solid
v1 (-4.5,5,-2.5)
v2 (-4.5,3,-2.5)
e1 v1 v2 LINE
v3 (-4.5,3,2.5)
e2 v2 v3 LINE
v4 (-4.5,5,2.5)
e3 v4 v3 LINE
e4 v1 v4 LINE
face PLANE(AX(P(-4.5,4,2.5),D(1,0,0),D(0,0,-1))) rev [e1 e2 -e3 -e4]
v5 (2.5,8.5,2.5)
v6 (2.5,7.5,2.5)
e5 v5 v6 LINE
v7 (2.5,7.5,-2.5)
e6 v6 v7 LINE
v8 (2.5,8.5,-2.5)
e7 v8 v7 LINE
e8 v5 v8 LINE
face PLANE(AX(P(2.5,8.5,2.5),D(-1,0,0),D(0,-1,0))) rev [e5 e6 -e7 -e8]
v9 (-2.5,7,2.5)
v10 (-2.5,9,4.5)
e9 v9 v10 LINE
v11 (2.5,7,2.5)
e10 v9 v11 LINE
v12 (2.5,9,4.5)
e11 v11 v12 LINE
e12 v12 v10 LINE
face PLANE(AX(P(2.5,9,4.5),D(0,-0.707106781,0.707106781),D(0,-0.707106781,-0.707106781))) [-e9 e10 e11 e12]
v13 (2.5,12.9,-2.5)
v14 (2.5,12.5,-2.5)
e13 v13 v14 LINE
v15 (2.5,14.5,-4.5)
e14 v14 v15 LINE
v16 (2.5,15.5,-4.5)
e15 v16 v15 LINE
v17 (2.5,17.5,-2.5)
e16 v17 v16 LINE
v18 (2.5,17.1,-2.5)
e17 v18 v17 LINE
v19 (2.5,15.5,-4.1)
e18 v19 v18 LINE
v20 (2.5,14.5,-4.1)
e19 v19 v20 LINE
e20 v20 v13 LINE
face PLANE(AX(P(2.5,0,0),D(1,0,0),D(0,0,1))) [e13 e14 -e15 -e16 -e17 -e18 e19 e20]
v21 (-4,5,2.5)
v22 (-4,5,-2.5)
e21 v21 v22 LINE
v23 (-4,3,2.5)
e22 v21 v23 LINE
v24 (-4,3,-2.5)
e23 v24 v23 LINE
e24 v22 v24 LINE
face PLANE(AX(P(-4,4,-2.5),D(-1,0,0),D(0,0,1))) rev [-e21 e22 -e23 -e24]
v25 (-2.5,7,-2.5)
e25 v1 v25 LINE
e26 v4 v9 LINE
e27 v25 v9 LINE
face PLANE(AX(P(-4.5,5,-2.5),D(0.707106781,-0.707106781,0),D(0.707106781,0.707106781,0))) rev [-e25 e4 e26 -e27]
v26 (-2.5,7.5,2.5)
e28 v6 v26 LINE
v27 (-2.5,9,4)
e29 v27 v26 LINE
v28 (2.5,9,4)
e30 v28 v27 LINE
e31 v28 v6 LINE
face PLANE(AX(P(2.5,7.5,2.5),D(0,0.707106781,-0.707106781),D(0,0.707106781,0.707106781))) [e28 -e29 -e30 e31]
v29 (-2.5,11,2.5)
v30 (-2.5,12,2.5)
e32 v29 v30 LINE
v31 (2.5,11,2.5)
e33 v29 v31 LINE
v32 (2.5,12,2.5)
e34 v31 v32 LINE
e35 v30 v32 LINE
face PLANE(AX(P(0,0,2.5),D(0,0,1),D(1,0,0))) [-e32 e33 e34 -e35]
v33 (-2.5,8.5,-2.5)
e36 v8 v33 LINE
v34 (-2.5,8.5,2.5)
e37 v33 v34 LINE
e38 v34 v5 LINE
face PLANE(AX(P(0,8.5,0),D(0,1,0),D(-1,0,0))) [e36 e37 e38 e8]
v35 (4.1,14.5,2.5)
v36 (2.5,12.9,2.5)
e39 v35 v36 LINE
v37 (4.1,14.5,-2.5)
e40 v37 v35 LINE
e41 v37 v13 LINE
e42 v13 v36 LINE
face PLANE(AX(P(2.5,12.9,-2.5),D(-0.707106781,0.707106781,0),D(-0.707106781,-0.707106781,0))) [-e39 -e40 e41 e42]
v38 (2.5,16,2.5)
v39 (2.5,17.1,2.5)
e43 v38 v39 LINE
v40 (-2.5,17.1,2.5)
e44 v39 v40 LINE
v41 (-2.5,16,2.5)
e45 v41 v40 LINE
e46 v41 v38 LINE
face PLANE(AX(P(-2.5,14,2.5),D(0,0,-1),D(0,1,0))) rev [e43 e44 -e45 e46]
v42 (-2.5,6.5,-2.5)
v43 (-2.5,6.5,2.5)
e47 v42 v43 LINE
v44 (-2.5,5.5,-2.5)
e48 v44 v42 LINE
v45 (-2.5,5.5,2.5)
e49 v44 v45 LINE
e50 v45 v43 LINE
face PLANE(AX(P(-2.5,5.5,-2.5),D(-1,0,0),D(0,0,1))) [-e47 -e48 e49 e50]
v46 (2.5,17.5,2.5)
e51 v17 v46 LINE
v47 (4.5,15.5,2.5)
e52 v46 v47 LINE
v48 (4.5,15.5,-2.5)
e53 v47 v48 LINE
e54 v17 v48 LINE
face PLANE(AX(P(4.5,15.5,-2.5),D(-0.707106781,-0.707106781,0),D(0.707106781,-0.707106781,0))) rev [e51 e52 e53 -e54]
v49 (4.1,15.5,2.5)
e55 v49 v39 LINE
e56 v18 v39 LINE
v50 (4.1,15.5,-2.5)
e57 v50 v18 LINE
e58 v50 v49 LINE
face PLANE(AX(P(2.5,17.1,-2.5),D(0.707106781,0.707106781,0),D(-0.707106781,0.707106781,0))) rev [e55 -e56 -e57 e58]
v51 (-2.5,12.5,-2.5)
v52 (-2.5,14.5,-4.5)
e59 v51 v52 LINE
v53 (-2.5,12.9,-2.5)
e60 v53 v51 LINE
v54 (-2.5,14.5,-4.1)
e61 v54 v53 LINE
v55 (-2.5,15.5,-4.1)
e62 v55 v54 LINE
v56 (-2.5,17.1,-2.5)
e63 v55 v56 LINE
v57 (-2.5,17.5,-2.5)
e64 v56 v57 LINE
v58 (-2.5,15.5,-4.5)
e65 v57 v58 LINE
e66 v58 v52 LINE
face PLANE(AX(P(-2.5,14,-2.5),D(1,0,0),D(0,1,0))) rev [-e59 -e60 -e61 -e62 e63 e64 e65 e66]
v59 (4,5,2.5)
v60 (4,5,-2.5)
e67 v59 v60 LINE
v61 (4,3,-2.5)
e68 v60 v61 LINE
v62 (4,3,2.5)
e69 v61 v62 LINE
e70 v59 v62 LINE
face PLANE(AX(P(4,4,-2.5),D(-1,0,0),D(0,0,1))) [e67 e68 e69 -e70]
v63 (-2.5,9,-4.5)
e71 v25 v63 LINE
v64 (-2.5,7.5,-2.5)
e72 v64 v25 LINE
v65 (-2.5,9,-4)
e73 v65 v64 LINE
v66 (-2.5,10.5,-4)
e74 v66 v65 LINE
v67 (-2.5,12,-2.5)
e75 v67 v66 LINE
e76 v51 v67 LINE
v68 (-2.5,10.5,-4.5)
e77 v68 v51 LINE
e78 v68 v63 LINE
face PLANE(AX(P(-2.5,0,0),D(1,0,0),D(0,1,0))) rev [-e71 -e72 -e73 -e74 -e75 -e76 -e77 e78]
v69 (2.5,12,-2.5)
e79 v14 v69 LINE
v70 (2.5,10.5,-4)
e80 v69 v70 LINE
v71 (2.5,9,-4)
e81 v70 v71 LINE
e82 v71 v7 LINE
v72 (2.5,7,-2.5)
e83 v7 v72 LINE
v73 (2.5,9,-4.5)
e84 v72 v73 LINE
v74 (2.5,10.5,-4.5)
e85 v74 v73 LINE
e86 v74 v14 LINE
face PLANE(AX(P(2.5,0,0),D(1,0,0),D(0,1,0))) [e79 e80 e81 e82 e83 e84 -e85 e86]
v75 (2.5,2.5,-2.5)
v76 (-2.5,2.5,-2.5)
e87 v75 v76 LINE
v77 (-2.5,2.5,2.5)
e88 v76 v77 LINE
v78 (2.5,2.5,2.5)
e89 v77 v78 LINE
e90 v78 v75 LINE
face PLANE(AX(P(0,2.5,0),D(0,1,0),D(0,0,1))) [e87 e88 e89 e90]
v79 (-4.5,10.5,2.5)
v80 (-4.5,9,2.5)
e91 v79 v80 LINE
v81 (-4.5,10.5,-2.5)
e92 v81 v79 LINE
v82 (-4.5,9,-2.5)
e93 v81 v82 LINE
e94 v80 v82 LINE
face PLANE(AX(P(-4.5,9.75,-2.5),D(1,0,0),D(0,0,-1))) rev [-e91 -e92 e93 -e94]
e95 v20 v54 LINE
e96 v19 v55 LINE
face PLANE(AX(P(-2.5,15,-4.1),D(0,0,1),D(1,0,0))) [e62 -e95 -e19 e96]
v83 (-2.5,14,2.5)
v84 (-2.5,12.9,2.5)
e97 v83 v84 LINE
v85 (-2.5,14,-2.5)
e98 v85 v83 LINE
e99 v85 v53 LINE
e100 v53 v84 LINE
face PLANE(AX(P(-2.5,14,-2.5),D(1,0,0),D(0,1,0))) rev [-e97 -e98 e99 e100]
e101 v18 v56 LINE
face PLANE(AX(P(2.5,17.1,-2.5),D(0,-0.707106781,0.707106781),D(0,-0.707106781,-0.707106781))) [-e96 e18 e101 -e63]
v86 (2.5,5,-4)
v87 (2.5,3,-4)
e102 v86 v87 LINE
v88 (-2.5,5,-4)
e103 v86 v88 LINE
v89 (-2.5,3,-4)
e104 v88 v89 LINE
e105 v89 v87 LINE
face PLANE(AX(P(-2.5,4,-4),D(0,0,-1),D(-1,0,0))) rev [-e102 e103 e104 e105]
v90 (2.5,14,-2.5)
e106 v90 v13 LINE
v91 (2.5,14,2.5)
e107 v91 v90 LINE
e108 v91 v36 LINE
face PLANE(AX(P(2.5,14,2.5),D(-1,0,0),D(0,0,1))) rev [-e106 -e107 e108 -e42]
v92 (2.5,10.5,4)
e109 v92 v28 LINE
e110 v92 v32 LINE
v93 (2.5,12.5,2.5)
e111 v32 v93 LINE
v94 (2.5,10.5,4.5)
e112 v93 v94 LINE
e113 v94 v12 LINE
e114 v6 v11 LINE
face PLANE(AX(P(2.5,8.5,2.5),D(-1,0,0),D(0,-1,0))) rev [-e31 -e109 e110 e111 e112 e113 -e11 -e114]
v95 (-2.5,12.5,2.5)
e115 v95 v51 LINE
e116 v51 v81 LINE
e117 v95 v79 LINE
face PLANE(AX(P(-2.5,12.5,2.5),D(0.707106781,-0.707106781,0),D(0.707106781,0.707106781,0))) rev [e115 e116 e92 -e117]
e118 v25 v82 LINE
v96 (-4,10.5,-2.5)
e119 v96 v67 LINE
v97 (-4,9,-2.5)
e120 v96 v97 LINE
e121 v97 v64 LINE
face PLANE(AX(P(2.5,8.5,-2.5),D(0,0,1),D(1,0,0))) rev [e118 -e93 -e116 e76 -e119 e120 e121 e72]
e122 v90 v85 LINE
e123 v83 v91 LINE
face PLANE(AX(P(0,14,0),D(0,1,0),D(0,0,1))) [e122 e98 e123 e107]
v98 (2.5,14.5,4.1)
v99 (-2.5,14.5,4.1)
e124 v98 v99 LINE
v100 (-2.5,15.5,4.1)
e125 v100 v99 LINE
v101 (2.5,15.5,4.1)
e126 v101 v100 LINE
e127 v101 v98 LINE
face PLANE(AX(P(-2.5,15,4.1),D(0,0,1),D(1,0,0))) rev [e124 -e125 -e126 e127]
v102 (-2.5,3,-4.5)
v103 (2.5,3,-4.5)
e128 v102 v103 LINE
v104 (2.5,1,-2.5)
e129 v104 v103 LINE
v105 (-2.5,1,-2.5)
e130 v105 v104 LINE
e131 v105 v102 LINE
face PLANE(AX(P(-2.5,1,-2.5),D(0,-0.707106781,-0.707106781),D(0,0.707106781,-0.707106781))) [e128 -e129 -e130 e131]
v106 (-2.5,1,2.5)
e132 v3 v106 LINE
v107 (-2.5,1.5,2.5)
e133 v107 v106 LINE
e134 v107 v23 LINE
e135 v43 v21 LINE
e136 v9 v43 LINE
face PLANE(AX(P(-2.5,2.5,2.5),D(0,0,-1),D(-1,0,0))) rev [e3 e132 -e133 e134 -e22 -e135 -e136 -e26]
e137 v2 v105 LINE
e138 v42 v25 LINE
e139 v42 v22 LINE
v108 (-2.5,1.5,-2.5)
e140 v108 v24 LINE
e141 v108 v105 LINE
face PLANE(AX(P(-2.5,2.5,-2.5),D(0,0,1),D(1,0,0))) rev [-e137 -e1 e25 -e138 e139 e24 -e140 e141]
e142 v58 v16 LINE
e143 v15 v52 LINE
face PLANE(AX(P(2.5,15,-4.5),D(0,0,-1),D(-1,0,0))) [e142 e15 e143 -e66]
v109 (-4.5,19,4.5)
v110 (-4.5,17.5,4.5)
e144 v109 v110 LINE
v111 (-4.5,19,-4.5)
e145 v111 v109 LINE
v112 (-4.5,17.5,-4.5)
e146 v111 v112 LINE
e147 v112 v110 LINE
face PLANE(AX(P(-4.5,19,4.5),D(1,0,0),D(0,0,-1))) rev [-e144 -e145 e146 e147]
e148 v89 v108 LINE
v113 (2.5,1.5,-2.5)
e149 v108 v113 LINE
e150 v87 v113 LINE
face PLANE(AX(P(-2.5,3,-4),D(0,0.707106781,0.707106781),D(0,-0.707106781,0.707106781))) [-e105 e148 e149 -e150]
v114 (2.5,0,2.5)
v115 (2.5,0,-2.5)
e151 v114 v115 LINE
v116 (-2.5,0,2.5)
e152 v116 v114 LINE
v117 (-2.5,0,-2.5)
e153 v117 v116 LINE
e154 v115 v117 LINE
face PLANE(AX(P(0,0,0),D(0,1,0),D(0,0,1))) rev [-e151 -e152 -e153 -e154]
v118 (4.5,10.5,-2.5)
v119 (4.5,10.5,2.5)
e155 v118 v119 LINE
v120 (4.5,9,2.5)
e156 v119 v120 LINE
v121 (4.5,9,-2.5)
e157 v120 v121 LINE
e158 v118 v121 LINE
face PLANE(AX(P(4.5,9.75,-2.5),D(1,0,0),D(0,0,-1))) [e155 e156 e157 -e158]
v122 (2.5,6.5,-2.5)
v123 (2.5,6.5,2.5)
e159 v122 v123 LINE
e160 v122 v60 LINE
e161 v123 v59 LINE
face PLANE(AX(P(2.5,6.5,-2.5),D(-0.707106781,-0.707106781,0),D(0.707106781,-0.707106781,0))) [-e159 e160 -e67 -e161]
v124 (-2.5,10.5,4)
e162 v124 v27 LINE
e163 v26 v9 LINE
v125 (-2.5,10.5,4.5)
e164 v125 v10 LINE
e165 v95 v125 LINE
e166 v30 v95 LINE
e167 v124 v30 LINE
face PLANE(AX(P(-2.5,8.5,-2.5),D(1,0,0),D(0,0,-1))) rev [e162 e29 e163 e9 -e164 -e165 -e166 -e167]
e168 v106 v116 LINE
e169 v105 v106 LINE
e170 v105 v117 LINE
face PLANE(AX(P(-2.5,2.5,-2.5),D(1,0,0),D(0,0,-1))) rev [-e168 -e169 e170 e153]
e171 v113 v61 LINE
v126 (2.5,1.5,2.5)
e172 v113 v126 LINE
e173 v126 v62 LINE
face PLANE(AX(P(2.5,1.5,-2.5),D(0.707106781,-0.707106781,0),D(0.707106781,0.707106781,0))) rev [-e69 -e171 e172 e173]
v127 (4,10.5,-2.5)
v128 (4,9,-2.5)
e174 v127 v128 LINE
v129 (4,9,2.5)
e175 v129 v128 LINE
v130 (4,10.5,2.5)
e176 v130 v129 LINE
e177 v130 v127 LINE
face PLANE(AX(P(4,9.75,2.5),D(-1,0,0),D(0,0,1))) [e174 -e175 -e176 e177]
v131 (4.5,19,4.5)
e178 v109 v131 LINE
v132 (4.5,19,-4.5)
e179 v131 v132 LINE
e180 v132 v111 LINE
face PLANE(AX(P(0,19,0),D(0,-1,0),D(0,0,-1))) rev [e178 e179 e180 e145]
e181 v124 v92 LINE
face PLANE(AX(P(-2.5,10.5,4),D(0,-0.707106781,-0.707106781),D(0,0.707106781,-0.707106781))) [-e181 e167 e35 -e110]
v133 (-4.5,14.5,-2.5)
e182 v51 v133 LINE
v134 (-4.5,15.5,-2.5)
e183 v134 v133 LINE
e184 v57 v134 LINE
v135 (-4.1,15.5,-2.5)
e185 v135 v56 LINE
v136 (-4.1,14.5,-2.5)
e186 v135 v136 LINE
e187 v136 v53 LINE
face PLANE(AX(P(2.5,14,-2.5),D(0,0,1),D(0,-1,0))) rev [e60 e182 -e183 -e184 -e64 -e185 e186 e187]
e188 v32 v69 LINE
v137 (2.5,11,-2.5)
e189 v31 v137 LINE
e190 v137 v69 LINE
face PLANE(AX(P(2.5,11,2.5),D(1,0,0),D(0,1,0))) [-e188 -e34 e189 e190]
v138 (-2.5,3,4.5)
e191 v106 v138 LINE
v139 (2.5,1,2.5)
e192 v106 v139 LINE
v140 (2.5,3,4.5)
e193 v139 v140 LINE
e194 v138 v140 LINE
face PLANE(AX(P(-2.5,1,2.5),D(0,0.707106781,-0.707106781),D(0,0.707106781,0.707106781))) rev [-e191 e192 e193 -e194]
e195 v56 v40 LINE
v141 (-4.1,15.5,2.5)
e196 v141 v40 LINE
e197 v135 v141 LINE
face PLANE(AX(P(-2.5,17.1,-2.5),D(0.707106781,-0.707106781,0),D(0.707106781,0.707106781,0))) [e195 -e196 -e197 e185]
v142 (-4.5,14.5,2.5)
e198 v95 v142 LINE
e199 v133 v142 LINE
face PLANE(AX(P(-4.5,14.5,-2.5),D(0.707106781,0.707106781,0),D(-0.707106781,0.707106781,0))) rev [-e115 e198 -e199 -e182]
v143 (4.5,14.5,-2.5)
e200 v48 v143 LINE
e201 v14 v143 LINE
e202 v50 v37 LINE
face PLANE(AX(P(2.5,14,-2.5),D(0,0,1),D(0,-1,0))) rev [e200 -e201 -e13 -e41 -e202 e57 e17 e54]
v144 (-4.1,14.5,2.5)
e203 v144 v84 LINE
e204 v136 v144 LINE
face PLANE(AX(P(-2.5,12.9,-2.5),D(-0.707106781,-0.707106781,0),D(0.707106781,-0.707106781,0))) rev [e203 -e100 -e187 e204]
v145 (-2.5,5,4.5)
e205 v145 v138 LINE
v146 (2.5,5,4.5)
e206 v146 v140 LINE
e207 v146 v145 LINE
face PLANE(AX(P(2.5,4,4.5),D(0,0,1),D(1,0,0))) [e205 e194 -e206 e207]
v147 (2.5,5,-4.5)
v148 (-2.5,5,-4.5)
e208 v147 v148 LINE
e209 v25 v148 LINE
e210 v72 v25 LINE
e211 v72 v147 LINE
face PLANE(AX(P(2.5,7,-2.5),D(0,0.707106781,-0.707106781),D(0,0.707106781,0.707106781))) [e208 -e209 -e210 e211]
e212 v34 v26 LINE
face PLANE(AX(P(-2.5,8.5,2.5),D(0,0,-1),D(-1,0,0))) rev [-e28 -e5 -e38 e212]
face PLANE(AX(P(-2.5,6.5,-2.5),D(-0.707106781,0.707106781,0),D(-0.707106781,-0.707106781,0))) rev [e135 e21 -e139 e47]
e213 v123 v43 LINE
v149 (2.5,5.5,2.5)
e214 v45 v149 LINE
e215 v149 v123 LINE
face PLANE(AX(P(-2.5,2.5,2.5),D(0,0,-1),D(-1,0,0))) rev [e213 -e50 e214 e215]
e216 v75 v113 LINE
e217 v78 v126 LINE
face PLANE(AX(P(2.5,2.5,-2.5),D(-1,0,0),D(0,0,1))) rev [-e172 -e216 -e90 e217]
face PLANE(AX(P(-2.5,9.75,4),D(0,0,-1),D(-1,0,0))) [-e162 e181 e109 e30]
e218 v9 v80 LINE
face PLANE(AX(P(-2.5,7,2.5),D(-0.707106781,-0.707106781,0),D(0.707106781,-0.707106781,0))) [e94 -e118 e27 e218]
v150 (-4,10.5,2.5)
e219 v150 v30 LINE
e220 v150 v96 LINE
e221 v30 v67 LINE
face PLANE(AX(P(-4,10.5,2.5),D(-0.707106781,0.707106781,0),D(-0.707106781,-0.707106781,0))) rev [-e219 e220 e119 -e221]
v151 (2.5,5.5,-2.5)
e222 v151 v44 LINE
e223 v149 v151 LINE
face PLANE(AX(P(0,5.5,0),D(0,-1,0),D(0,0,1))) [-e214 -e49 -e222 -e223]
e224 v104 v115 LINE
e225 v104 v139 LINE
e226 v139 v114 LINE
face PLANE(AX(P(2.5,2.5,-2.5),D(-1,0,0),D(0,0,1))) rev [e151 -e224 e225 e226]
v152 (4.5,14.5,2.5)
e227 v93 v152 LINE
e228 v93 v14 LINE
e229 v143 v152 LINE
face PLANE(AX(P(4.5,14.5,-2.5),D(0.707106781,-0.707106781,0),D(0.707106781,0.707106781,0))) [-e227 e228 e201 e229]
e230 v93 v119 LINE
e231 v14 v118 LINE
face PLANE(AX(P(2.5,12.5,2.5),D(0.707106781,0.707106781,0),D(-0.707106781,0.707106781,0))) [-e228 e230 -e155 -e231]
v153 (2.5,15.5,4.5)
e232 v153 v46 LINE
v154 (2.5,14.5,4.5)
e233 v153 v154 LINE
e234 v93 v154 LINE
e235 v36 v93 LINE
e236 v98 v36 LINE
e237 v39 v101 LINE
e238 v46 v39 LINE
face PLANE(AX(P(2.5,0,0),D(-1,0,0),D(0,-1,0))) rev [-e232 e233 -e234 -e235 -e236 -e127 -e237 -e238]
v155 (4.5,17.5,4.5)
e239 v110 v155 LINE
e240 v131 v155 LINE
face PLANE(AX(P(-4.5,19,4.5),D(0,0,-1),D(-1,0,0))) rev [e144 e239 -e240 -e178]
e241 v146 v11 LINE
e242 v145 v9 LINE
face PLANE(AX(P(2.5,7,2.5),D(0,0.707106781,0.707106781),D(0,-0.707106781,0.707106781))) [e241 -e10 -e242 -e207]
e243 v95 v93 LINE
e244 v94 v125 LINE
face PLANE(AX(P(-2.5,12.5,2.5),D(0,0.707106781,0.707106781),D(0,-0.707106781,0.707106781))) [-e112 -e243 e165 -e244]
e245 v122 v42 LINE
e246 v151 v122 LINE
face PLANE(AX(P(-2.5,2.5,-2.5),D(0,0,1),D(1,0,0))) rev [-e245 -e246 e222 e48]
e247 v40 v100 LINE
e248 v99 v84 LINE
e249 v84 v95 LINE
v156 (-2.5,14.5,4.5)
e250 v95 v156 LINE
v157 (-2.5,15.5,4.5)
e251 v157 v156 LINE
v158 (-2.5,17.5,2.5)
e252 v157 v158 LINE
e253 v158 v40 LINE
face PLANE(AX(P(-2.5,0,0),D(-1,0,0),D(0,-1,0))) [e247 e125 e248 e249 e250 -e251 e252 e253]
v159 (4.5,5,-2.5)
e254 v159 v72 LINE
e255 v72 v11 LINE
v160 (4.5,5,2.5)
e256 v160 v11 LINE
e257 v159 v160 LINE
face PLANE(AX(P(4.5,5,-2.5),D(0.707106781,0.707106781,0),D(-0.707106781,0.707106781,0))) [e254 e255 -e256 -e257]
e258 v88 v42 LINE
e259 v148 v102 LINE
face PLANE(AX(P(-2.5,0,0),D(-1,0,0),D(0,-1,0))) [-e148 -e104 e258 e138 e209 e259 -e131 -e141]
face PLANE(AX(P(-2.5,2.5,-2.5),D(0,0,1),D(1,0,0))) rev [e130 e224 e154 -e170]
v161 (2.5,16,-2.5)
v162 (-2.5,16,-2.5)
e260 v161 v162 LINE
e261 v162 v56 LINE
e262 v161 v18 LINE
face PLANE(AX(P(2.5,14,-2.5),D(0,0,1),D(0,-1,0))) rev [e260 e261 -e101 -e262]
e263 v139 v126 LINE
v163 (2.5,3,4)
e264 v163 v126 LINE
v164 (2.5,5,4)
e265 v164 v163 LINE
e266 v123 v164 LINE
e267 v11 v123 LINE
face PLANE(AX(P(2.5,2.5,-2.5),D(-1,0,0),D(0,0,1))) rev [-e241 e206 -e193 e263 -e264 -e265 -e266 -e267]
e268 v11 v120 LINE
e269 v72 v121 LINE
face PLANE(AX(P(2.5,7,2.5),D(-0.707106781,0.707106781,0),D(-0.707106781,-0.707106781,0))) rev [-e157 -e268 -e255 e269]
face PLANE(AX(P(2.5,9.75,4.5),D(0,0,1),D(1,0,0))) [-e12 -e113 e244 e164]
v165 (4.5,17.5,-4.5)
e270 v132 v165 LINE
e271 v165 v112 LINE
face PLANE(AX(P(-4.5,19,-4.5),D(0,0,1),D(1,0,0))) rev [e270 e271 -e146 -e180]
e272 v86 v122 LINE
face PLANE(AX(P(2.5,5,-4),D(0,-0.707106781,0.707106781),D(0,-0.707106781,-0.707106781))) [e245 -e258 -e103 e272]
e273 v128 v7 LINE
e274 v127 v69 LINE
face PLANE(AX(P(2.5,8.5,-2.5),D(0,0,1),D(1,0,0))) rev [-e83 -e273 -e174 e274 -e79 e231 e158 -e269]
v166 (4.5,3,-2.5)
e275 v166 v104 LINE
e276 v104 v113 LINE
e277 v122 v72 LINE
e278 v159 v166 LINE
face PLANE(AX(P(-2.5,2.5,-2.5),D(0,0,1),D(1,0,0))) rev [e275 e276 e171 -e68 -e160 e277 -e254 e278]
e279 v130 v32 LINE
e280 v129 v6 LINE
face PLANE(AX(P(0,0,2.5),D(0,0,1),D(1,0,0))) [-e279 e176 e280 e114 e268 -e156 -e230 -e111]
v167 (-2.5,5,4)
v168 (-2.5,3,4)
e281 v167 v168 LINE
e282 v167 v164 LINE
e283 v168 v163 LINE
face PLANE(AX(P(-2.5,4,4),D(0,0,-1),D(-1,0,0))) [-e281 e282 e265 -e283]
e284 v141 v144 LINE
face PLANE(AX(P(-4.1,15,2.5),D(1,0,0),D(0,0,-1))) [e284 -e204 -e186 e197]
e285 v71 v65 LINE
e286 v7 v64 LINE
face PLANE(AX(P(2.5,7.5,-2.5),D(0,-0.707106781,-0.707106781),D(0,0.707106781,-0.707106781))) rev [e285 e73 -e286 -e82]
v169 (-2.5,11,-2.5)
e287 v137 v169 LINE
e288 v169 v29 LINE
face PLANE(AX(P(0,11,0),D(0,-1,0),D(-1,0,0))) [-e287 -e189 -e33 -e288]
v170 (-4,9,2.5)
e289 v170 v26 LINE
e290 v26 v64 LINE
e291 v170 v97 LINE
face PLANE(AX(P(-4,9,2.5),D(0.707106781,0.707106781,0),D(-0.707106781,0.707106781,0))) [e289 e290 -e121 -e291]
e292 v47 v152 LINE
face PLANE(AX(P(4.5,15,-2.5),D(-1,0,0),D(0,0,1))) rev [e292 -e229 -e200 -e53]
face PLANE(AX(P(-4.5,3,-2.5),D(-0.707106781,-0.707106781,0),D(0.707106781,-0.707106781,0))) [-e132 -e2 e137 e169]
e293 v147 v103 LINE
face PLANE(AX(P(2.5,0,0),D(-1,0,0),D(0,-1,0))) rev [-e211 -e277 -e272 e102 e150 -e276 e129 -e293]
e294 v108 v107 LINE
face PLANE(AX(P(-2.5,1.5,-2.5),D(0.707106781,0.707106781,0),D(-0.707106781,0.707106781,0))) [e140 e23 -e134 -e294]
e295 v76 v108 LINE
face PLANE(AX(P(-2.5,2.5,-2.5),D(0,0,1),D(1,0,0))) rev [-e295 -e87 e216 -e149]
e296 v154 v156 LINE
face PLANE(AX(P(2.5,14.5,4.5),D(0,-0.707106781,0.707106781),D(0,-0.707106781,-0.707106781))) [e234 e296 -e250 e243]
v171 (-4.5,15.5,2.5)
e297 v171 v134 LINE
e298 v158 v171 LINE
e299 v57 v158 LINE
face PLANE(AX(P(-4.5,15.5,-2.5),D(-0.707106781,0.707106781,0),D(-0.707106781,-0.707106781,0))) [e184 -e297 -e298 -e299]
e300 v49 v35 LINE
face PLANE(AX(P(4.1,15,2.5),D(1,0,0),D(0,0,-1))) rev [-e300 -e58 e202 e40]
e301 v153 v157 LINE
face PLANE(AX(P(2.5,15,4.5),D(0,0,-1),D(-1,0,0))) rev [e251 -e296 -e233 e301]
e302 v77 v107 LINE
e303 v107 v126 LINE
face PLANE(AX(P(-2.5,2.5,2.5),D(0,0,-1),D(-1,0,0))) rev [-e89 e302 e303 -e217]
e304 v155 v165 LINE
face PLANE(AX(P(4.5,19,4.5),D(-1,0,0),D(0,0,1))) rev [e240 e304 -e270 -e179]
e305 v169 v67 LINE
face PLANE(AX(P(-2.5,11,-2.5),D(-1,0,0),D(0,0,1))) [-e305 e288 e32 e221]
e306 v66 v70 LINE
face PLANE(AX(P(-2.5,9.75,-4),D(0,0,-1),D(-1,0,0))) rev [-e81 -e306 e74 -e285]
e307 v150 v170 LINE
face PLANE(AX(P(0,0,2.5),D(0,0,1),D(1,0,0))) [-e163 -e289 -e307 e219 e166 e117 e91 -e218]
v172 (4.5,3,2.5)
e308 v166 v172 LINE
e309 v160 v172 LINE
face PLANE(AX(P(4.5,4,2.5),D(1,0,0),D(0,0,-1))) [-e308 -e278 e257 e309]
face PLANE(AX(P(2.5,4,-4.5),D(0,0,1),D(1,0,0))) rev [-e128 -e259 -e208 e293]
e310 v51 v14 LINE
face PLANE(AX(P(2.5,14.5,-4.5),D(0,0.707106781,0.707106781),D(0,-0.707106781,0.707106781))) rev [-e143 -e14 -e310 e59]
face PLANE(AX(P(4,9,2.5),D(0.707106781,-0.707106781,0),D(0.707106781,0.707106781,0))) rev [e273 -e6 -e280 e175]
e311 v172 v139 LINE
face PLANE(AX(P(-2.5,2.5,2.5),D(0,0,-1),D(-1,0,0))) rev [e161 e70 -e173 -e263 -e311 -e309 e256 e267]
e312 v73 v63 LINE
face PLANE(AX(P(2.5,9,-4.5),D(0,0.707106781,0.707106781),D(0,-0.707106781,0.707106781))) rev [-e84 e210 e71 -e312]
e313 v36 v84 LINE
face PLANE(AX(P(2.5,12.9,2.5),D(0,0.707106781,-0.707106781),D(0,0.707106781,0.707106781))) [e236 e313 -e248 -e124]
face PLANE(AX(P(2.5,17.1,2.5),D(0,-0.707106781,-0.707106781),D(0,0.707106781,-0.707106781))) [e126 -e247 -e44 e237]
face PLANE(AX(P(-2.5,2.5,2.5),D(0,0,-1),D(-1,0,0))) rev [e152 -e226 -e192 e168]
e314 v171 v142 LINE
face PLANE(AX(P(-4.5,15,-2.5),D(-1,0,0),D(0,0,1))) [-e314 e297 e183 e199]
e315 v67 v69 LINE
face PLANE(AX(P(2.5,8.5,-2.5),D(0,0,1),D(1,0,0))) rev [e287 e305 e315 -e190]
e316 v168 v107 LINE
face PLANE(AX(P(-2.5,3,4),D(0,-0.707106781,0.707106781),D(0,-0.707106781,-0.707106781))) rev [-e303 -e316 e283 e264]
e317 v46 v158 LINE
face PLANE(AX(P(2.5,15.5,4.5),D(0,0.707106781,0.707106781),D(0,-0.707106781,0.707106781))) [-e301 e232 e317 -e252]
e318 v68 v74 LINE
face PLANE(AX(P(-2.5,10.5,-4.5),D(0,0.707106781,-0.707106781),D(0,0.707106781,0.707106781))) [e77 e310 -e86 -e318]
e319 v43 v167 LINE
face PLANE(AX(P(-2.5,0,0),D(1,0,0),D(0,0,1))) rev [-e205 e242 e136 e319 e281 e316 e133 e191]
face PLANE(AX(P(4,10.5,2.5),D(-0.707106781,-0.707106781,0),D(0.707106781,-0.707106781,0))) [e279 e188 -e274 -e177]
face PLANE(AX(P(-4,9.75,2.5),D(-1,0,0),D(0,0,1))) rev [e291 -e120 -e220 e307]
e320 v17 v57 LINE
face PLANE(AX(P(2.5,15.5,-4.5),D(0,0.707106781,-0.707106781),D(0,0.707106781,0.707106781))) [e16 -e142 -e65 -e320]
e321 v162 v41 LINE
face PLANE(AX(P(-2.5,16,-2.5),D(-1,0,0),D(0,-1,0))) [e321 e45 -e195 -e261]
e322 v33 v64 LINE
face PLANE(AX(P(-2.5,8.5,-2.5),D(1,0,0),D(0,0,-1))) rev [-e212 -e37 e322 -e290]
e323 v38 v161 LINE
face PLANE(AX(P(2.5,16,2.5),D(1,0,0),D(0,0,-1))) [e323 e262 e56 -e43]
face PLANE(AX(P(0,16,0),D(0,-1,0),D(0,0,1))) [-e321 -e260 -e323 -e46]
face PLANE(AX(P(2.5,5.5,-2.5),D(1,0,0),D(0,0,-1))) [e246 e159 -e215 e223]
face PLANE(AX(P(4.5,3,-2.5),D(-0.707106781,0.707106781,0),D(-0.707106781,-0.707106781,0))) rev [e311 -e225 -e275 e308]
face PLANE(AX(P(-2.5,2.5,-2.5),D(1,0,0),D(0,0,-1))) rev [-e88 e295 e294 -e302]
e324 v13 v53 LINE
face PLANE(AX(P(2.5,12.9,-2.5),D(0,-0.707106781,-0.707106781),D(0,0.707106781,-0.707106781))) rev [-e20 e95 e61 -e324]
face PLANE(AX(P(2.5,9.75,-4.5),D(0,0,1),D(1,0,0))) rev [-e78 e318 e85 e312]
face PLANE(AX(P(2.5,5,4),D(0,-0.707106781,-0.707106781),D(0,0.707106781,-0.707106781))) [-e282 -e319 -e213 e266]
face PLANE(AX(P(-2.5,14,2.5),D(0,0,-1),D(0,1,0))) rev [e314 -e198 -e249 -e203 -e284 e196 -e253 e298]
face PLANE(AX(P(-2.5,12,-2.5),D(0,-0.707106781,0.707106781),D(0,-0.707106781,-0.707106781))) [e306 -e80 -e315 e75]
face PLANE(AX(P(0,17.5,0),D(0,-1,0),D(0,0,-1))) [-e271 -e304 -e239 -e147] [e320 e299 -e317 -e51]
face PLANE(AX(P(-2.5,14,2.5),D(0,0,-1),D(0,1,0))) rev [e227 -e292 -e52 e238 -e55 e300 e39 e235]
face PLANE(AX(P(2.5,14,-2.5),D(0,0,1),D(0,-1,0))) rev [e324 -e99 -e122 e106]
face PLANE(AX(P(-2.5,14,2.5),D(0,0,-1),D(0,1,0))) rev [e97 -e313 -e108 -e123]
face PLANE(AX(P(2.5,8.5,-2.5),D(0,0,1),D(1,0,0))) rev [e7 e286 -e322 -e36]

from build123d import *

# Parameters (mm, degrees)
SKETCH2_W                = 5
SKETCH2_H                = 5
BOSS_EXTRUDE1_DEPTH      = 2.5
BOSS_EXTRUDE2_DEPTH      = 5
BOSS_EXTRUDE3_DEPTH      = 5
SKETCH5_W                = 0.5
SKETCH5_H                = 5
BOSS_EXTRUDE4_DEPTH      = 1
SKETCH6_W                = 5
SKETCH6_H                = 0.5
BOSS_EXTRUDE5_DEPTH      = 1
MIRROR3_START            = -2.5
MIRROR3_OUTLINE_W        = 0.5
MIRROR3_OUTLINE_H        = 1
MIRROR3_DEPTH            = 5
MIRROR5_COPY_1_DEPTH     = 5
MIRROR5_COPY_2_DEPTH     = 5
MIRROR6_START            = -2.5
MIRROR6_OUTLINE_W        = 1
MIRROR6_OUTLINE_H        = 0.5
MIRROR6_DEPTH            = 5
BOSS_EXTRUDE7_DEPTH      = 5
BOSS_EXTRUDE9_DEPTH      = 5
SKETCH10_W               = 5
SKETCH10_H               = 1
CUT_EXTRUDE1_DEPTH       = 12.543396381
SKETCH11_W               = 5
SKETCH11_H               = 5
BOSS_EXTRUDE11_DEPTH     = 1.5
BOSS_EXTRUDE13_DEPTH     = 5
BOSS_EXTRUDE14_DEPTH     = 5
SKETCH15_W               = 0.5
SKETCH15_H               = 5
BOSS_EXTRUDE15_DEPTH     = 0.75
SKETCH16_W               = 5
SKETCH16_H               = 0.5
BOSS_EXTRUDE16_DEPTH     = 0.75
MIRROR16_COPY_1_SKETCH_W = 0.5
MIRROR16_COPY_1_SKETCH_H = 5
MIRROR16_COPY_1_DEPTH    = 0.75
MIRROR16_COPY_2_SKETCH_W = 5
MIRROR16_COPY_2_SKETCH_H = 0.5
MIRROR16_COPY_2_DEPTH    = 0.75
MIRROR18_COPY_1_DEPTH    = 5
BOSS_EXTRUDE18_DEPTH     = 5
BOSS_EXTRUDE19_DEPTH     = 5
SKETCH20_W               = 5
SKETCH20_H               = 5
BOSS_EXTRUDE20_DEPTH     = 1.5
BOSS_EXTRUDE21_DEPTH     = 5
BOSS_EXTRUDE22_DEPTH     = 5
SKETCH23_W               = 0.4
SKETCH23_H               = 5
BOSS_EXTRUDE23_DEPTH     = 0.5
SKETCH24_W               = 5
SKETCH24_H               = 0.4
BOSS_EXTRUDE24_DEPTH     = 0.5
MIRROR24_START           = -2.5
MIRROR24_OUTLINE_W       = 0.4
MIRROR24_OUTLINE_H       = 0.5
MIRROR24_DEPTH           = 5
MIRROR25_START           = -2.5
MIRROR25_DEPTH           = 5
MIRROR26_START           = -2.5
MIRROR26_OUTLINE_W       = 0.5
MIRROR26_OUTLINE_H       = 0.4
MIRROR26_DEPTH           = 5
BOSS_EXTRUDE25_DEPTH     = 5
BOSS_EXTRUDE26_DEPTH     = 5
SKETCH27_W               = 9
SKETCH27_H               = 9
BOSS_EXTRUDE27_DEPTH     = 1.5


# Read off the part's stored shape, not the designer's step: Mirror3, Mirror6, Mirror24, Mirror25, Mirror26
with BuildPart() as part:
    # Sketch2 → Boss-Extrude1 (new body)
    with BuildSketch(Plane(origin=(0, 0, 0), x_dir=(1, 0, 0), z_dir=(0, 1, 0))):
        Rectangle(SKETCH2_W, SKETCH2_H)
    boss_extrude1 = extrude(amount=BOSS_EXTRUDE1_DEPTH)

    # Sketch3 → Boss-Extrude2 (add)
    with BuildSketch(Plane.XY.offset(2.5)):
        Polygon((-2.5, 1.5), (-4, 3), (-4.5, 3), (-2.5, 1), align=None)
    boss_extrude2 = extrude(amount=-BOSS_EXTRUDE2_DEPTH)

    # Sketch4 → Boss-Extrude3 (add)
    with BuildSketch(Plane(origin=(2.5, 0, 0), x_dir=(0, 0, -1), z_dir=(1, 0, 0))):
        Polygon((2.5, 1.5), (2.5, 1), (4.5, 3), (4, 3), align=None)
    boss_extrude3 = extrude(amount=-BOSS_EXTRUDE3_DEPTH)

    # Sketch5 → Boss-Extrude4 (add)
    with BuildSketch(Plane(origin=(0, 3, 0), x_dir=(1, 0, 0), z_dir=(0, 1, 0))):
        with Locations((-4.25, 0)):
            Rectangle(SKETCH5_W, SKETCH5_H)
    boss_extrude4 = extrude(amount=BOSS_EXTRUDE4_DEPTH)

    # Sketch6 → Boss-Extrude5 (add)
    with BuildSketch(Plane(origin=(0, 3, 0), x_dir=(1, 0, 0), z_dir=(0, 1, 0))):
        with Locations((0, 4.25)):
            Rectangle(SKETCH6_W, SKETCH6_H)
    boss_extrude5 = extrude(amount=BOSS_EXTRUDE5_DEPTH)

    # Mirror1: Boss-Extrude3, Boss-Extrude5 across plane
    add(boss_extrude3.mirror(Plane.XY))
    add(boss_extrude5.mirror(Plane.XY))

    # Mirror2: Boss-Extrude2, Boss-Extrude4 across plane
    add(boss_extrude2.mirror(Plane(origin=(0, 0, 0), x_dir=(0, 0, 1), z_dir=(1, 0, 0))))
    add(boss_extrude4.mirror(Plane(origin=(0, 0, 0), x_dir=(0, 0, 1), z_dir=(1, 0, 0))))

    # Mirror3 outline → Mirror3 (add)
    with BuildSketch(Plane.XY.offset(MIRROR3_START)):
        with Locations((-4.25, 4.5)):
            Rectangle(MIRROR3_OUTLINE_W, MIRROR3_OUTLINE_H)
        with Locations((4.25, 4.5)):
            Rectangle(MIRROR3_OUTLINE_W, MIRROR3_OUTLINE_H)
    extrude(amount=MIRROR3_DEPTH)

    # Mirror4: Boss-Extrude2 across plane
    add(boss_extrude2.mirror(Plane.ZX.offset(4)))

    # Mirror5 copy 1 sketch → Mirror5 copy 1 (add)
    with BuildSketch(Plane(origin=(0, 8, 2.5), x_dir=(-1, 0, 0), z_dir=(0, 0, 1))):
        Polygon((-2.5, 1.5), (-4, 3), (-4.5, 3), (-2.5, 1), align=None)
    extrude(amount=-MIRROR5_COPY_1_DEPTH)

    # Mirror5 copy 2 sketch → Mirror5 copy 2 (add)
    with BuildSketch(Plane(origin=(0, 0, 2.5), x_dir=(-1, 0, 0), z_dir=(0, 0, 1))):
        Polygon((-2.5, -1.5), (-4, -3), (-4.5, -3), (-2.5, -1), align=None)
    extrude(amount=-MIRROR5_COPY_2_DEPTH)

    # Mirror6 outline → Mirror6 (add)
    with BuildSketch(Plane.YZ.offset(MIRROR6_START)):
        with Locations((4.5, -4.25)):
            Rectangle(MIRROR6_OUTLINE_W, MIRROR6_OUTLINE_H)
        with Locations((4.5, 4.25)):
            Rectangle(MIRROR6_OUTLINE_W, MIRROR6_OUTLINE_H)
    extrude(amount=MIRROR6_DEPTH)

    # Mirror10: Boss-Extrude1 across plane
    add(boss_extrude1.mirror(Plane.ZX.offset(4)))

    # Sketch10 → Cut-Extrude1 (cut, through all)
    with BuildSketch(Plane.XY.offset(2.5)):
        with Locations((0, 7.5)):
            Rectangle(SKETCH10_W, SKETCH10_H)
    extrude(amount=-CUT_EXTRUDE1_DEPTH, mode=Mode.SUBTRACT)



with BuildPart() as body_2:
    # Sketch7 → Boss-Extrude7 (new body)
    with BuildSketch(Plane.ZY.offset(2.5)):
        Polygon((-4.5, 5), (-4, 5), (-2.5, 6.5), (-2.5, 7), align=None)
    extrude(amount=-BOSS_EXTRUDE7_DEPTH)


with BuildPart() as body_3:
    # Sketch8 → Boss-Extrude9 (new body)
    with BuildSketch(Plane.ZY.offset(2.5)):
        Polygon((4.5, 5), (4, 5), (2.5, 6.5), (2.5, 7), align=None)
    extrude(amount=-BOSS_EXTRUDE9_DEPTH)


with BuildPart() as part_1:
    add(part.part)

    add(body_2.part)  # Boss-Extrude11 merges body 2

    add(body_3.part)  # Boss-Extrude11 merges body 3
    # Sketch11 → Boss-Extrude11 (add)
    with BuildSketch(Plane(origin=(0, 7, 0), x_dir=(1, 0, 0), z_dir=(0, 1, 0))):
        Rectangle(SKETCH11_W, SKETCH11_H)
    boss_extrude11 = extrude(amount=BOSS_EXTRUDE11_DEPTH)

    # Sketch13 → Boss-Extrude13 (add)
    with BuildSketch(Plane.ZY.offset(2.5)):
        Polygon((2.5, 7), (2.5, 7.5), (4, 9), (4.5, 9), align=None)
    boss_extrude13 = extrude(amount=-BOSS_EXTRUDE13_DEPTH)

    # Sketch14 → Boss-Extrude14 (add)
    with BuildSketch(Plane(origin=(0, 0, -2.5), x_dir=(-1, 0, 0), z_dir=(0, 0, -1))):
        Polygon((2.5, 7), (4.5, 9), (4, 9), (2.5, 7.5), align=None)
    boss_extrude14 = extrude(amount=-BOSS_EXTRUDE14_DEPTH)

    # Mirror12: Boss-Extrude13 across plane
    add(boss_extrude13.mirror(Plane.XY))

    # Mirror13: Boss-Extrude14 across plane
    add(boss_extrude14.mirror(Plane(origin=(0, 0, 0), x_dir=(0, 0, 1), z_dir=(1, 0, 0))))

    # Sketch15 → Boss-Extrude15 (add)
    with BuildSketch(Plane(origin=(0, 9, 0), x_dir=(1, 0, 0), z_dir=(0, 1, 0))):
        with Locations((-4.25, 0)):
            Rectangle(SKETCH15_W, SKETCH15_H)
    boss_extrude15 = extrude(amount=BOSS_EXTRUDE15_DEPTH)

    # Sketch16 → Boss-Extrude16 (add)
    with BuildSketch(Plane(origin=(0, 9, 0), x_dir=(1, 0, 0), z_dir=(0, 1, 0))):
        with Locations((0, 4.25)):
            Rectangle(SKETCH16_W, SKETCH16_H)
    boss_extrude16 = extrude(amount=BOSS_EXTRUDE16_DEPTH)

    # Mirror14: Boss-Extrude15 across plane
    add(boss_extrude15.mirror(Plane(origin=(0, 0, 0), x_dir=(0, 0, 1), z_dir=(1, 0, 0))))

    # Mirror15: Boss-Extrude16 across plane
    add(boss_extrude16.mirror(Plane.XY))

    # Mirror16: Boss-Extrude15, Boss-Extrude16 across plane
    add(boss_extrude15.mirror(Plane.ZX.offset(9.75)))
    add(boss_extrude16.mirror(Plane.ZX.offset(9.75)))

    # Mirror16 copy 1 sketch → Mirror16 copy 1 (add)
    with BuildSketch(Plane(origin=(0, 10.5, 0), x_dir=(-1, 0, 0), z_dir=(0, -1, 0))):
        with Locations((-4.25, 0)):
            Rectangle(MIRROR16_COPY_1_SKETCH_W, MIRROR16_COPY_1_SKETCH_H)
    extrude(amount=MIRROR16_COPY_1_DEPTH)

    # Mirror16 copy 2 sketch → Mirror16 copy 2 (add)
    with BuildSketch(Plane.XZ.offset(-10.5)):
        with Locations((0, 4.25)):
            Rectangle(MIRROR16_COPY_2_SKETCH_W, MIRROR16_COPY_2_SKETCH_H)
    extrude(amount=MIRROR16_COPY_2_DEPTH)

    # Mirror18: Boss-Extrude14 across plane
    add(boss_extrude14.mirror(Plane.ZX.offset(9.75)))

    # Mirror18 copy 1 sketch → Mirror18 copy 1 (add)
    with BuildSketch(Plane(origin=(0, 19.5, -2.5), x_dir=(1, 0, 0), z_dir=(0, 0, -1))):
        Polygon((2.5, 7), (4.5, 9), (4, 9), (2.5, 7.5), align=None)
    extrude(amount=-MIRROR18_COPY_1_DEPTH)

    # Mirror21: Boss-Extrude11 across plane
    add(boss_extrude11.mirror(Plane.ZX.offset(9.75)))



with BuildPart() as body_2_2:
    # Sketch17 → Boss-Extrude18 (new body)
    with BuildSketch(Plane(origin=(2.5, 0, 0), x_dir=(0, 0, -1), z_dir=(1, 0, 0))):
        Polygon((4, 10.5), (4.5, 10.5), (2.5, 12.5), (2.5, 12), align=None)
    extrude(amount=-BOSS_EXTRUDE18_DEPTH)


with BuildPart() as body_3_2:
    # Sketch18 → Boss-Extrude19 (new body)
    with BuildSketch(Plane(origin=(2.5, 0, 0), x_dir=(0, 0, -1), z_dir=(1, 0, 0))):
        Polygon((-4.5, 10.5), (-4, 10.5), (-2.5, 12), (-2.5, 12.5), align=None)
    extrude(amount=-BOSS_EXTRUDE19_DEPTH)


with BuildPart() as part_2:
    add(part_1.part)

    add(body_2_2.part)  # Boss-Extrude20 merges body 2 2

    add(body_3_2.part)  # Boss-Extrude20 merges body 3 2
    # Sketch20 → Boss-Extrude20 (add)
    with BuildSketch(Plane(origin=(0, 12.5, 0), x_dir=(1, 0, 0), z_dir=(0, 1, 0))):
        Rectangle(SKETCH20_W, SKETCH20_H)
    boss_extrude20 = extrude(amount=BOSS_EXTRUDE20_DEPTH)

    # Sketch21 → Boss-Extrude21 (add)
    with BuildSketch(Plane.XY.offset(2.5)):
        Polygon((2.5, 12.5), (2.5, 12.9), (4.1, 14.5), (4.5, 14.5), align=None)
    boss_extrude21 = extrude(amount=-BOSS_EXTRUDE21_DEPTH)

    # Sketch22 → Boss-Extrude22 (add)
    with BuildSketch(Plane.ZY.offset(2.5)):
        Polygon((2.5, 12.5), (2.5, 12.9), (4.1, 14.5), (4.5, 14.5), align=None)
    boss_extrude22 = extrude(amount=-BOSS_EXTRUDE22_DEPTH)

    # Sketch23 → Boss-Extrude23 (add)
    with BuildSketch(Plane(origin=(0, 14.5, 0), x_dir=(1, 0, 0), z_dir=(0, 1, 0))):
        with Locations((4.3, 0)):
            Rectangle(SKETCH23_W, SKETCH23_H)
    boss_extrude23 = extrude(amount=BOSS_EXTRUDE23_DEPTH)

    # Sketch24 → Boss-Extrude24 (add)
    with BuildSketch(Plane(origin=(0, 14.5, 0), x_dir=(1, 0, 0), z_dir=(0, 1, 0))):
        with Locations((0, -4.3)):
            Rectangle(SKETCH24_W, SKETCH24_H)
    boss_extrude24 = extrude(amount=BOSS_EXTRUDE24_DEPTH)

    # Mirror22: Boss-Extrude22, Boss-Extrude24 across plane
    add(boss_extrude22.mirror(Plane.XY))
    add(boss_extrude24.mirror(Plane.XY))

    # Mirror23: Boss-Extrude21, Boss-Extrude23 across plane
    add(boss_extrude21.mirror(Plane(origin=(0, 0, 0), x_dir=(0, 0, 1), z_dir=(1, 0, 0))))
    add(boss_extrude23.mirror(Plane(origin=(0, 0, 0), x_dir=(0, 0, 1), z_dir=(1, 0, 0))))

    # Mirror24 outline → Mirror24 (add)
    with BuildSketch(Plane.XY.offset(MIRROR24_START)):
        with Locations((-4.3, 15.25)):
            Rectangle(MIRROR24_OUTLINE_W, MIRROR24_OUTLINE_H)
        with Locations((4.3, 15.25)):
            Rectangle(MIRROR24_OUTLINE_W, MIRROR24_OUTLINE_H)
    extrude(amount=MIRROR24_DEPTH)

    # Mirror25 outline → Mirror25 (add)
    with BuildSketch(Plane.XY.offset(MIRROR25_START)):
        Polygon((-2.5, 17.1), (-2.5, 17.5), (-4.5, 15.5), (-4.1, 15.5), align=None)
        Polygon((4.5, 15.5), (2.5, 17.5), (2.5, 17.1), (4.1, 15.5), align=None)
    extrude(amount=MIRROR25_DEPTH)

    # Mirror26 outline → Mirror26 (add)
    with BuildSketch(Plane.YZ.offset(MIRROR26_START)):
        with Locations((15.25, -4.3)):
            Rectangle(MIRROR26_OUTLINE_W, MIRROR26_OUTLINE_H)
        with Locations((15.25, 4.3)):
            Rectangle(MIRROR26_OUTLINE_W, MIRROR26_OUTLINE_H)
    extrude(amount=MIRROR26_DEPTH)

    # Mirror28: Boss-Extrude20 across plane
    add(boss_extrude20.mirror(Plane.ZX.offset(15)))



with BuildPart() as body_2_3:
    # Sketch25 → Boss-Extrude25 (new body)
    with BuildSketch(Plane.ZY.offset(2.5)):
        Polygon((4.1, 15.5), (4.5, 15.5), (2.5, 17.5), (2.5, 17.1), align=None)
    extrude(amount=-BOSS_EXTRUDE25_DEPTH)


with BuildPart() as body_3_3:
    # Sketch26 → Boss-Extrude26 (new body)
    with BuildSketch(Plane.ZY.offset(2.5)):
        Polygon((-4.1, 15.5), (-4.5, 15.5), (-2.5, 17.5), (-2.5, 17.1), align=None)
    extrude(amount=-BOSS_EXTRUDE26_DEPTH)


with BuildPart() as part_3:
    add(part_2.part)

    add(body_2_3.part)  # Boss-Extrude27 merges body 2 3

    add(body_3_3.part)  # Boss-Extrude27 merges body 3 3
    # Sketch27 → Boss-Extrude27 (add)
    with BuildSketch(Plane(origin=(0, 17.5, 0), x_dir=(1, 0, 0), z_dir=(0, 1, 0))):
        Rectangle(SKETCH27_W, SKETCH27_H)
    extrude(amount=BOSS_EXTRUDE27_DEPTH)


solid = part_3.part
